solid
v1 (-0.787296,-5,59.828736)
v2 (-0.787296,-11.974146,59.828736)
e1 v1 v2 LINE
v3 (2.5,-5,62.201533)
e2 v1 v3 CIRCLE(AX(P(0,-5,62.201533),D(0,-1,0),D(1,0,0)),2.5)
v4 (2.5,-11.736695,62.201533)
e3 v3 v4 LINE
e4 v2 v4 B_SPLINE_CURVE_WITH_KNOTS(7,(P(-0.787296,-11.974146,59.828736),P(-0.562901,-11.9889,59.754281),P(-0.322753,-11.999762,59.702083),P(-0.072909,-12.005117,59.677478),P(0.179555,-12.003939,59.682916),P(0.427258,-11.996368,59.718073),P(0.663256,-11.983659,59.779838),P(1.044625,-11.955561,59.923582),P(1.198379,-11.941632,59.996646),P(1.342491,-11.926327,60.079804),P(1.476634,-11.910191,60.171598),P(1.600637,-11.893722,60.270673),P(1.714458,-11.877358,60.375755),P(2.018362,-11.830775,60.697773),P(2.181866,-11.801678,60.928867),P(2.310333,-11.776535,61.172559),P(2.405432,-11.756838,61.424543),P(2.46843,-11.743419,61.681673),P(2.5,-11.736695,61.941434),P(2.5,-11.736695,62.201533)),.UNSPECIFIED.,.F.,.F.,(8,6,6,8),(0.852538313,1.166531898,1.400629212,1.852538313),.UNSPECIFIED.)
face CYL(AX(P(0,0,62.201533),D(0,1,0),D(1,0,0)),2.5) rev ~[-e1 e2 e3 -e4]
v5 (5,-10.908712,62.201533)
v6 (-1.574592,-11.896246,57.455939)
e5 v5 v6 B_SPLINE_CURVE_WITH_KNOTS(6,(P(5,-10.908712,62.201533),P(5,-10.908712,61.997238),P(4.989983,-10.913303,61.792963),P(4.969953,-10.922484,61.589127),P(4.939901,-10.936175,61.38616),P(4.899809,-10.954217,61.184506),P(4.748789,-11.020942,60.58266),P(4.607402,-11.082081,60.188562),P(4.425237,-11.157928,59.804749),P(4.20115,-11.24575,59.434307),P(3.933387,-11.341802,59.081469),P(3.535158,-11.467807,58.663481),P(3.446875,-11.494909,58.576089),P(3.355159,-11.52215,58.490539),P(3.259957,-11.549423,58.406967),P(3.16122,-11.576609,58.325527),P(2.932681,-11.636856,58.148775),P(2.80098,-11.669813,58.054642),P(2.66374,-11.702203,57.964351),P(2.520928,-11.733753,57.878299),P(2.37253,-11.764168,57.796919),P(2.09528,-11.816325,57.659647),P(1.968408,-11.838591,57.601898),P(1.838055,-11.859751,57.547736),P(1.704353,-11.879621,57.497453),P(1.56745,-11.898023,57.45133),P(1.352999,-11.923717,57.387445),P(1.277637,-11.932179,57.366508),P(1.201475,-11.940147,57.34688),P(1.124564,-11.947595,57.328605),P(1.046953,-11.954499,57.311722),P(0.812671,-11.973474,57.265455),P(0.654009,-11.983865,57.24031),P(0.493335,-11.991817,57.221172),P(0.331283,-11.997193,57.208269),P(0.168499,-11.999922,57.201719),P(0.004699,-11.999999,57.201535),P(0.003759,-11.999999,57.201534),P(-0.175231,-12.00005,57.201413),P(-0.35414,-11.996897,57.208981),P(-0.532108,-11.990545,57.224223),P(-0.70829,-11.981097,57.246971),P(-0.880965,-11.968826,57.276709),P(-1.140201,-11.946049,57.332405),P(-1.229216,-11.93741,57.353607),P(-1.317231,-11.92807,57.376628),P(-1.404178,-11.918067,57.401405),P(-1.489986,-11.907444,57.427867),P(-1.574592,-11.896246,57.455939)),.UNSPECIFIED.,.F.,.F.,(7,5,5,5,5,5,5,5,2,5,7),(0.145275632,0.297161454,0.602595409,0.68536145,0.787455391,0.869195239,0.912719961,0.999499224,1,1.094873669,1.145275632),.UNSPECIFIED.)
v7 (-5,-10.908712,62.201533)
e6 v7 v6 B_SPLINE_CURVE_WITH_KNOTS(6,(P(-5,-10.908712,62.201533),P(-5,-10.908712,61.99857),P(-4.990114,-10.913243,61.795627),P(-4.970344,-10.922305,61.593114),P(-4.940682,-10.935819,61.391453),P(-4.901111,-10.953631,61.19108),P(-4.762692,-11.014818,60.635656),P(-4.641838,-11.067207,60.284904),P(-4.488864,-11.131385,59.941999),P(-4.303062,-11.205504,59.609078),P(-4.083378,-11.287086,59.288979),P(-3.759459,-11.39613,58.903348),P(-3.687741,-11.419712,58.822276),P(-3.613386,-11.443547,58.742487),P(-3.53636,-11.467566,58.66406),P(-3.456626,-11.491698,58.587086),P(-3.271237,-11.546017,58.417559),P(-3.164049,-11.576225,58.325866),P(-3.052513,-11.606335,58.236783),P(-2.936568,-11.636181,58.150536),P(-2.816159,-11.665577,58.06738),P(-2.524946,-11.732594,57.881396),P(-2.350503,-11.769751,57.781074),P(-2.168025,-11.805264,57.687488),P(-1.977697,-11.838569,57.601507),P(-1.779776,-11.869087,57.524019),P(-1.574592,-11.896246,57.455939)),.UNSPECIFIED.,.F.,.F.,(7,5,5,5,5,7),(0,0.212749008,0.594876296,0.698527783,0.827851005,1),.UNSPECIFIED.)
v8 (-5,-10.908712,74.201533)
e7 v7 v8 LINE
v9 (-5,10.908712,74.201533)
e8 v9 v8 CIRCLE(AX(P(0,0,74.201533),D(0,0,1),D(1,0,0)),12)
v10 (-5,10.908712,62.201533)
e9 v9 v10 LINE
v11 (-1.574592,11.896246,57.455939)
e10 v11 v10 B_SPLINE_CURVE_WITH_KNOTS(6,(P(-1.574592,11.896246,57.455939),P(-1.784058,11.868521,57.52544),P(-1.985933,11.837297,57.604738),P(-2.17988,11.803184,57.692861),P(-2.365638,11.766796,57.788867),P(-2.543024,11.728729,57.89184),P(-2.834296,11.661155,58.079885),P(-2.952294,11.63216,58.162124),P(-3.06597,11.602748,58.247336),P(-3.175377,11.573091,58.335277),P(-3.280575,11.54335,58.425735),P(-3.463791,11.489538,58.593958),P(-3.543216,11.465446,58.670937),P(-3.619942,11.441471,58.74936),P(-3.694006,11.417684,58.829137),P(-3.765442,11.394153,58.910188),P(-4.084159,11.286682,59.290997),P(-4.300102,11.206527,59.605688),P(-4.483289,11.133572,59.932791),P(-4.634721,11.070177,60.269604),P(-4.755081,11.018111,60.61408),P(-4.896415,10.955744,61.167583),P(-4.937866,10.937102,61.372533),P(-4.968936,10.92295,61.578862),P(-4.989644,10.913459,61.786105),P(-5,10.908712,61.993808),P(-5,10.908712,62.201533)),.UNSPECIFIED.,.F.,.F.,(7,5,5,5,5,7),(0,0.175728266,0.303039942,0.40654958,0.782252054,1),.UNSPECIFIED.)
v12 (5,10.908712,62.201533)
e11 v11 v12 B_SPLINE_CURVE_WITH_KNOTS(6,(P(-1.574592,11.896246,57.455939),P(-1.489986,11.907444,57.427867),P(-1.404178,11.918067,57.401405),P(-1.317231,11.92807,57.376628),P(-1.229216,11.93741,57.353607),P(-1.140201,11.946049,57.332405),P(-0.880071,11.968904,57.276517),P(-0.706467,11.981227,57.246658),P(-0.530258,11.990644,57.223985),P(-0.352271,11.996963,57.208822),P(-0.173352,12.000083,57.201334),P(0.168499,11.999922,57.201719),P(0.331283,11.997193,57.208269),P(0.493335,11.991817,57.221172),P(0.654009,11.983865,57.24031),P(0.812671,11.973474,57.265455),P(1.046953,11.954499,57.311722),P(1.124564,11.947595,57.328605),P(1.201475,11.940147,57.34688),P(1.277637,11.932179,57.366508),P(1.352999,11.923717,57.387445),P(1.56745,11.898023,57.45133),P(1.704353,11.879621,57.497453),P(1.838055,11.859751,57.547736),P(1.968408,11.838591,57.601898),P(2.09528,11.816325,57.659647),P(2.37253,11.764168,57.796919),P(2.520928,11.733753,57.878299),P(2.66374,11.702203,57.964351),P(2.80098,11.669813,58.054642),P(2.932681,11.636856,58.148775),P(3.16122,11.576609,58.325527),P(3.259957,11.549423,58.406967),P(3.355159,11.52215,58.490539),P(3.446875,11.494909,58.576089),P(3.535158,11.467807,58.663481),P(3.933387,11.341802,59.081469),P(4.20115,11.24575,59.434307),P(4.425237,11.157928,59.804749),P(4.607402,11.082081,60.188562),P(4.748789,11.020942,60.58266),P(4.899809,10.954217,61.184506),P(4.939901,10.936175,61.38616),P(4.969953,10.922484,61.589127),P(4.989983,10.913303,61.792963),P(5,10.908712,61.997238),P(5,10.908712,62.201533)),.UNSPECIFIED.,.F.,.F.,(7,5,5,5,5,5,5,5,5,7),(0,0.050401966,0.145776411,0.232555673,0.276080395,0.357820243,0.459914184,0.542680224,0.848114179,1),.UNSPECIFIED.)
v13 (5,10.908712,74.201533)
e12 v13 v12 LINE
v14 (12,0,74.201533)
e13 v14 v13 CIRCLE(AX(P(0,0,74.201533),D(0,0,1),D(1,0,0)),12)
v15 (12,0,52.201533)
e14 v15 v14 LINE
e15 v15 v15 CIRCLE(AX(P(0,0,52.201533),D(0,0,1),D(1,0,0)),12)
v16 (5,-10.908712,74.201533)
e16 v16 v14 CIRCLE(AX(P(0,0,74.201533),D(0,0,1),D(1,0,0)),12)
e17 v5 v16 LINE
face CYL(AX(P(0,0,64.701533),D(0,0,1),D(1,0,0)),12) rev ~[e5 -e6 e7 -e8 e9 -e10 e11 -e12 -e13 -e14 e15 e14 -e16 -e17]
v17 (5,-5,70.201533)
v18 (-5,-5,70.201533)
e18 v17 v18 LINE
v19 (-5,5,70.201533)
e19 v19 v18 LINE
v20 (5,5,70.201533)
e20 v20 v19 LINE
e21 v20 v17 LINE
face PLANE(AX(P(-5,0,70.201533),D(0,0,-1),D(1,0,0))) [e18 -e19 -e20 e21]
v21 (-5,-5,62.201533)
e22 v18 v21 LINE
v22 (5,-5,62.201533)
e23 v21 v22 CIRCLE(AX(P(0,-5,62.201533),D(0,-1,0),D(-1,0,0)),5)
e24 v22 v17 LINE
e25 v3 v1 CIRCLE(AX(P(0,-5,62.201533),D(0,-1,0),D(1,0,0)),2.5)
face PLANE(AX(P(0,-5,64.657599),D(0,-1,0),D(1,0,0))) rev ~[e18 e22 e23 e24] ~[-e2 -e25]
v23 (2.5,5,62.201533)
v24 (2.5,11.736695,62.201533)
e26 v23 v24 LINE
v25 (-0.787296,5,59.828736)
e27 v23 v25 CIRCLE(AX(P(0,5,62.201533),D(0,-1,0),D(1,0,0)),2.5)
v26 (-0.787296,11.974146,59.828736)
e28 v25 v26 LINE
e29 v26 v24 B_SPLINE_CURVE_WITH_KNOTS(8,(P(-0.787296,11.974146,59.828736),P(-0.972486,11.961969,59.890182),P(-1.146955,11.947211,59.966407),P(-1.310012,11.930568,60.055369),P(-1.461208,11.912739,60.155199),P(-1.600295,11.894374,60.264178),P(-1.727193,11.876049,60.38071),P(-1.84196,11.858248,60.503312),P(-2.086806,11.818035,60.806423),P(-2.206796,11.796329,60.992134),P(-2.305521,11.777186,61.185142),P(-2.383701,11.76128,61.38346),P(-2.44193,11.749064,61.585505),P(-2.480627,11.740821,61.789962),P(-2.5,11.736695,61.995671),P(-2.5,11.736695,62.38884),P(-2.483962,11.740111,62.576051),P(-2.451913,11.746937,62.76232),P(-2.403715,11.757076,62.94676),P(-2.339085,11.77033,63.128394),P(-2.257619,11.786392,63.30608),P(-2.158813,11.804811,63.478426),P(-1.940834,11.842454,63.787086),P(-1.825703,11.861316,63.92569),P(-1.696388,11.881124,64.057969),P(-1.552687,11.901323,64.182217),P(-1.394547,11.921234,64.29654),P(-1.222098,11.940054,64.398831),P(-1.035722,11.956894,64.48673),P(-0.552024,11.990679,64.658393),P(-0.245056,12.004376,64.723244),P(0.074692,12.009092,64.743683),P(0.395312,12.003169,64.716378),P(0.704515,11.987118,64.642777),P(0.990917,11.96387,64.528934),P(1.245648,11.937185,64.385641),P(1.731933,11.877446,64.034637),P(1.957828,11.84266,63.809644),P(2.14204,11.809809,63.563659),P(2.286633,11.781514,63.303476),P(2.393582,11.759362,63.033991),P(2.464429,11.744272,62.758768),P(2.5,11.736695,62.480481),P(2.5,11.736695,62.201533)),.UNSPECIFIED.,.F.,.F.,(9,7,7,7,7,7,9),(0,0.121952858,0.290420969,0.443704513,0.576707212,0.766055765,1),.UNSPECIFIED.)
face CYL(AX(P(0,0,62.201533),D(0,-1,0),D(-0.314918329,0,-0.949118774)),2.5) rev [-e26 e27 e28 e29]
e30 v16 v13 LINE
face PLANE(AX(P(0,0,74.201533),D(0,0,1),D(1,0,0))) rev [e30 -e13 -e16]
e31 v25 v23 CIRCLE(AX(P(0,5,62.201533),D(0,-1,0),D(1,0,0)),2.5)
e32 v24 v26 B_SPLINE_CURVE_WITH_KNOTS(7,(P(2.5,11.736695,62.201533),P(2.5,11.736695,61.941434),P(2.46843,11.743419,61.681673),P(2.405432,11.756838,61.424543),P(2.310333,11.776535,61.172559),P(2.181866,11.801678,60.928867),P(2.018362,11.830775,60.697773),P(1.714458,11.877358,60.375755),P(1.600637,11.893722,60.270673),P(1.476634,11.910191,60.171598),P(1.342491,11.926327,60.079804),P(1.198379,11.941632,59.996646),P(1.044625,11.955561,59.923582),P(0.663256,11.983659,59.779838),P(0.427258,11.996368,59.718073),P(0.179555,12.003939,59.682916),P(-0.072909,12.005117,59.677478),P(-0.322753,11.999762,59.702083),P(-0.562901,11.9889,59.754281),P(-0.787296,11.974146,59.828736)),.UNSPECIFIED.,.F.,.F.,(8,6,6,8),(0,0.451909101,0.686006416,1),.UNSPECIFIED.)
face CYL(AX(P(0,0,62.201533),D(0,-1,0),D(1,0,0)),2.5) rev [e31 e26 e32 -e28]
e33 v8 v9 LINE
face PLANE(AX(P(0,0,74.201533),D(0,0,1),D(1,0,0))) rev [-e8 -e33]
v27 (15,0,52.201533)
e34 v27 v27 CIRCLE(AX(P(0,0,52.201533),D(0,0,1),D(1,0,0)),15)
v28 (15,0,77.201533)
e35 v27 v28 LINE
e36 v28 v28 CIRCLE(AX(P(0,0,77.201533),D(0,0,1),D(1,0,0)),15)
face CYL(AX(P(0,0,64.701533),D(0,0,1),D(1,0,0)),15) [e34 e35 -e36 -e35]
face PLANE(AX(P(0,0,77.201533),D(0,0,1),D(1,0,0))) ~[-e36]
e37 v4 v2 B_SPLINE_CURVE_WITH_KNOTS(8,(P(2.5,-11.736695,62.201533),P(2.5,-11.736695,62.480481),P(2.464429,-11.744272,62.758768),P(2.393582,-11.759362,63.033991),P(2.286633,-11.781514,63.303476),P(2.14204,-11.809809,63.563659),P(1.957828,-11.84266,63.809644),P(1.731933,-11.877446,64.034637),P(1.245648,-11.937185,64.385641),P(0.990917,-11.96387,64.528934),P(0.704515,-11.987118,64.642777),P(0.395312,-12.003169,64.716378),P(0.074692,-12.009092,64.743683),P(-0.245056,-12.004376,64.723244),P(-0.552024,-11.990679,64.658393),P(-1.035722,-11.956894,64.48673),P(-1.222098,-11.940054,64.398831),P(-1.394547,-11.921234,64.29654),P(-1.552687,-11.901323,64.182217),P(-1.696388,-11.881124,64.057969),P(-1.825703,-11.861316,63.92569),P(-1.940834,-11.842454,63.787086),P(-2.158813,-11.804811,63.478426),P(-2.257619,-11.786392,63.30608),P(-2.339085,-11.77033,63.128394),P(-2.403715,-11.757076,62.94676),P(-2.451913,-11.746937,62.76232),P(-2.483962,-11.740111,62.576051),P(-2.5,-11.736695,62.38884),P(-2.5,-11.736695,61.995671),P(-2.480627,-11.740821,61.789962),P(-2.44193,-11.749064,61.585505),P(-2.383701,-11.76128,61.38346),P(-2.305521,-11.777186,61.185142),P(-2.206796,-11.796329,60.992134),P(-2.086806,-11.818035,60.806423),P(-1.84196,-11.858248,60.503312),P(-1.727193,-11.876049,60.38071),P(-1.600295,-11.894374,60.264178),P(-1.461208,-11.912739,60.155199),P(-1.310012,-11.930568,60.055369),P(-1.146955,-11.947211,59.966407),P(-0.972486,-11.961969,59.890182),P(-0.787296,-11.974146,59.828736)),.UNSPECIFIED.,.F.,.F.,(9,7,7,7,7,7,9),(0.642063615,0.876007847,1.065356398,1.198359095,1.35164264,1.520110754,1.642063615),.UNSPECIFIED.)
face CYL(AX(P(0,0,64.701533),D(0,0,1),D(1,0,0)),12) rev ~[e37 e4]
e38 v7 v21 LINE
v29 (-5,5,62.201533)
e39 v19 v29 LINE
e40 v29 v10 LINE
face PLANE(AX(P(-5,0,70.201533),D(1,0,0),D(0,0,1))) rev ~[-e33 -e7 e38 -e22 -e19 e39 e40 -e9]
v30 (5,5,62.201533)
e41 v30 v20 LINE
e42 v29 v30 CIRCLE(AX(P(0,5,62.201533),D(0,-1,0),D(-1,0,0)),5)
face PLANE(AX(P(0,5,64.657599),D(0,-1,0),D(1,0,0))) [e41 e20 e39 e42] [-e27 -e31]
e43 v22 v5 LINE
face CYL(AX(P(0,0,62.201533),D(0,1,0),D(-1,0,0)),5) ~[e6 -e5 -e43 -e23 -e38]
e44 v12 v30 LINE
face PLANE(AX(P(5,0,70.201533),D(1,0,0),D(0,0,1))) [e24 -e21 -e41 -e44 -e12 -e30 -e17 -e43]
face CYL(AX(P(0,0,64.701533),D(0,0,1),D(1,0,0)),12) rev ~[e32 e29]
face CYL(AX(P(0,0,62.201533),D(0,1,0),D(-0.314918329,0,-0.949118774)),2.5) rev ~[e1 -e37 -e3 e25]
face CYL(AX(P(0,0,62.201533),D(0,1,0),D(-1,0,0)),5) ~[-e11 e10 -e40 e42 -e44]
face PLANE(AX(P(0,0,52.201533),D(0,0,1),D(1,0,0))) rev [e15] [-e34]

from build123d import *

# Parameters (mm, degrees)
F1_W          = 15
F1_H          = 25
F3_T          = -3
F4_DEPTH      = 12.0000001006
F4_DEPTH_BACK = 12.0000001006
F5_R          = 2.5
F6_DEPTH      = 5
F7_W          = 10
F7_H          = 7
F8_DEPTH      = 12
F8_DEPTH_BACK = 12


with BuildPart() as f2:
    # F1 (on Front) → F2 (revolve)
    with BuildSketch(Plane.XZ):
        with Locations((7.5, 64.7015325446)):
            Rectangle(F1_W, F1_H)
    revolve(axis=Axis((0, 0, 62.2015325446), (0, 0, 1)))

    # F3
    f3_openings = [f2.faces().sort_by_distance(p)[0] for p in [
        (0, 0, 52.201533),
    ]]
    offset(amount=F3_T, openings=f3_openings)

    # F0 (on Front) → F4 (join, two sides)
    with BuildSketch(Plane.XZ) as f4_sk:
        with BuildLine():
            ThreePointArc((-5, 62.2015325446), (-4.0541927813, 59.2751831307), (-1.5745916432, 57.4559386769))
            ThreePointArc((-1.5745916432, 57.4559386769), (2.9263494138, 58.1473397632), (5, 62.2015325446))
            Line((5, 62.2015325446), (5, 70.2015325446))
            Line((5, 70.2015325446), (-5, 70.2015325446))
            Line((-5, 70.2015325446), (-5, 62.2015325446))
        make_face()
        with BuildLine():
            ThreePointArc((2.5, 62.2015325446), (1.4631747069, 60.1744361539), (-0.7872958216, 59.8287356107))
            ThreePointArc((-0.7872958216, 59.8287356107), (-1.4631747069, 64.2286289352), (2.5, 62.2015325446))
        make_face(mode=Mode.SUBTRACT)
    extrude(amount=-F4_DEPTH)
    extrude(f4_sk.sketch, amount=F4_DEPTH_BACK)

    # F5 (on Front) → F6 (cut, symmetric)
    with BuildSketch(Plane.XZ):
        with BuildLine():
            Line((5, 70.2015325446), (-5, 70.2015325446))
            Line((-5, 70.2015325446), (-5, 62.2015325446))
            ThreePointArc((-5, 62.2015325446), (0, 57.2015325446), (5, 62.2015325446))
            Line((5, 62.2015325446), (5, 70.2015325446))
        make_face()
        with Locations((0, 62.2015325446)):
            Circle(F5_R, mode=Mode.SUBTRACT)
    extrude(amount=F6_DEPTH, both=True, mode=Mode.SUBTRACT)

    # F7 (on Front) → F8 (join, two sides)
    with BuildSketch(Plane.XZ) as f8_sk:
        with Locations((0, 73.7015325446)):
            Rectangle(F7_W, F7_H)
    extrude(amount=F8_DEPTH)
    extrude(f8_sk.sketch, amount=-F8_DEPTH_BACK)


solid = f2.part
